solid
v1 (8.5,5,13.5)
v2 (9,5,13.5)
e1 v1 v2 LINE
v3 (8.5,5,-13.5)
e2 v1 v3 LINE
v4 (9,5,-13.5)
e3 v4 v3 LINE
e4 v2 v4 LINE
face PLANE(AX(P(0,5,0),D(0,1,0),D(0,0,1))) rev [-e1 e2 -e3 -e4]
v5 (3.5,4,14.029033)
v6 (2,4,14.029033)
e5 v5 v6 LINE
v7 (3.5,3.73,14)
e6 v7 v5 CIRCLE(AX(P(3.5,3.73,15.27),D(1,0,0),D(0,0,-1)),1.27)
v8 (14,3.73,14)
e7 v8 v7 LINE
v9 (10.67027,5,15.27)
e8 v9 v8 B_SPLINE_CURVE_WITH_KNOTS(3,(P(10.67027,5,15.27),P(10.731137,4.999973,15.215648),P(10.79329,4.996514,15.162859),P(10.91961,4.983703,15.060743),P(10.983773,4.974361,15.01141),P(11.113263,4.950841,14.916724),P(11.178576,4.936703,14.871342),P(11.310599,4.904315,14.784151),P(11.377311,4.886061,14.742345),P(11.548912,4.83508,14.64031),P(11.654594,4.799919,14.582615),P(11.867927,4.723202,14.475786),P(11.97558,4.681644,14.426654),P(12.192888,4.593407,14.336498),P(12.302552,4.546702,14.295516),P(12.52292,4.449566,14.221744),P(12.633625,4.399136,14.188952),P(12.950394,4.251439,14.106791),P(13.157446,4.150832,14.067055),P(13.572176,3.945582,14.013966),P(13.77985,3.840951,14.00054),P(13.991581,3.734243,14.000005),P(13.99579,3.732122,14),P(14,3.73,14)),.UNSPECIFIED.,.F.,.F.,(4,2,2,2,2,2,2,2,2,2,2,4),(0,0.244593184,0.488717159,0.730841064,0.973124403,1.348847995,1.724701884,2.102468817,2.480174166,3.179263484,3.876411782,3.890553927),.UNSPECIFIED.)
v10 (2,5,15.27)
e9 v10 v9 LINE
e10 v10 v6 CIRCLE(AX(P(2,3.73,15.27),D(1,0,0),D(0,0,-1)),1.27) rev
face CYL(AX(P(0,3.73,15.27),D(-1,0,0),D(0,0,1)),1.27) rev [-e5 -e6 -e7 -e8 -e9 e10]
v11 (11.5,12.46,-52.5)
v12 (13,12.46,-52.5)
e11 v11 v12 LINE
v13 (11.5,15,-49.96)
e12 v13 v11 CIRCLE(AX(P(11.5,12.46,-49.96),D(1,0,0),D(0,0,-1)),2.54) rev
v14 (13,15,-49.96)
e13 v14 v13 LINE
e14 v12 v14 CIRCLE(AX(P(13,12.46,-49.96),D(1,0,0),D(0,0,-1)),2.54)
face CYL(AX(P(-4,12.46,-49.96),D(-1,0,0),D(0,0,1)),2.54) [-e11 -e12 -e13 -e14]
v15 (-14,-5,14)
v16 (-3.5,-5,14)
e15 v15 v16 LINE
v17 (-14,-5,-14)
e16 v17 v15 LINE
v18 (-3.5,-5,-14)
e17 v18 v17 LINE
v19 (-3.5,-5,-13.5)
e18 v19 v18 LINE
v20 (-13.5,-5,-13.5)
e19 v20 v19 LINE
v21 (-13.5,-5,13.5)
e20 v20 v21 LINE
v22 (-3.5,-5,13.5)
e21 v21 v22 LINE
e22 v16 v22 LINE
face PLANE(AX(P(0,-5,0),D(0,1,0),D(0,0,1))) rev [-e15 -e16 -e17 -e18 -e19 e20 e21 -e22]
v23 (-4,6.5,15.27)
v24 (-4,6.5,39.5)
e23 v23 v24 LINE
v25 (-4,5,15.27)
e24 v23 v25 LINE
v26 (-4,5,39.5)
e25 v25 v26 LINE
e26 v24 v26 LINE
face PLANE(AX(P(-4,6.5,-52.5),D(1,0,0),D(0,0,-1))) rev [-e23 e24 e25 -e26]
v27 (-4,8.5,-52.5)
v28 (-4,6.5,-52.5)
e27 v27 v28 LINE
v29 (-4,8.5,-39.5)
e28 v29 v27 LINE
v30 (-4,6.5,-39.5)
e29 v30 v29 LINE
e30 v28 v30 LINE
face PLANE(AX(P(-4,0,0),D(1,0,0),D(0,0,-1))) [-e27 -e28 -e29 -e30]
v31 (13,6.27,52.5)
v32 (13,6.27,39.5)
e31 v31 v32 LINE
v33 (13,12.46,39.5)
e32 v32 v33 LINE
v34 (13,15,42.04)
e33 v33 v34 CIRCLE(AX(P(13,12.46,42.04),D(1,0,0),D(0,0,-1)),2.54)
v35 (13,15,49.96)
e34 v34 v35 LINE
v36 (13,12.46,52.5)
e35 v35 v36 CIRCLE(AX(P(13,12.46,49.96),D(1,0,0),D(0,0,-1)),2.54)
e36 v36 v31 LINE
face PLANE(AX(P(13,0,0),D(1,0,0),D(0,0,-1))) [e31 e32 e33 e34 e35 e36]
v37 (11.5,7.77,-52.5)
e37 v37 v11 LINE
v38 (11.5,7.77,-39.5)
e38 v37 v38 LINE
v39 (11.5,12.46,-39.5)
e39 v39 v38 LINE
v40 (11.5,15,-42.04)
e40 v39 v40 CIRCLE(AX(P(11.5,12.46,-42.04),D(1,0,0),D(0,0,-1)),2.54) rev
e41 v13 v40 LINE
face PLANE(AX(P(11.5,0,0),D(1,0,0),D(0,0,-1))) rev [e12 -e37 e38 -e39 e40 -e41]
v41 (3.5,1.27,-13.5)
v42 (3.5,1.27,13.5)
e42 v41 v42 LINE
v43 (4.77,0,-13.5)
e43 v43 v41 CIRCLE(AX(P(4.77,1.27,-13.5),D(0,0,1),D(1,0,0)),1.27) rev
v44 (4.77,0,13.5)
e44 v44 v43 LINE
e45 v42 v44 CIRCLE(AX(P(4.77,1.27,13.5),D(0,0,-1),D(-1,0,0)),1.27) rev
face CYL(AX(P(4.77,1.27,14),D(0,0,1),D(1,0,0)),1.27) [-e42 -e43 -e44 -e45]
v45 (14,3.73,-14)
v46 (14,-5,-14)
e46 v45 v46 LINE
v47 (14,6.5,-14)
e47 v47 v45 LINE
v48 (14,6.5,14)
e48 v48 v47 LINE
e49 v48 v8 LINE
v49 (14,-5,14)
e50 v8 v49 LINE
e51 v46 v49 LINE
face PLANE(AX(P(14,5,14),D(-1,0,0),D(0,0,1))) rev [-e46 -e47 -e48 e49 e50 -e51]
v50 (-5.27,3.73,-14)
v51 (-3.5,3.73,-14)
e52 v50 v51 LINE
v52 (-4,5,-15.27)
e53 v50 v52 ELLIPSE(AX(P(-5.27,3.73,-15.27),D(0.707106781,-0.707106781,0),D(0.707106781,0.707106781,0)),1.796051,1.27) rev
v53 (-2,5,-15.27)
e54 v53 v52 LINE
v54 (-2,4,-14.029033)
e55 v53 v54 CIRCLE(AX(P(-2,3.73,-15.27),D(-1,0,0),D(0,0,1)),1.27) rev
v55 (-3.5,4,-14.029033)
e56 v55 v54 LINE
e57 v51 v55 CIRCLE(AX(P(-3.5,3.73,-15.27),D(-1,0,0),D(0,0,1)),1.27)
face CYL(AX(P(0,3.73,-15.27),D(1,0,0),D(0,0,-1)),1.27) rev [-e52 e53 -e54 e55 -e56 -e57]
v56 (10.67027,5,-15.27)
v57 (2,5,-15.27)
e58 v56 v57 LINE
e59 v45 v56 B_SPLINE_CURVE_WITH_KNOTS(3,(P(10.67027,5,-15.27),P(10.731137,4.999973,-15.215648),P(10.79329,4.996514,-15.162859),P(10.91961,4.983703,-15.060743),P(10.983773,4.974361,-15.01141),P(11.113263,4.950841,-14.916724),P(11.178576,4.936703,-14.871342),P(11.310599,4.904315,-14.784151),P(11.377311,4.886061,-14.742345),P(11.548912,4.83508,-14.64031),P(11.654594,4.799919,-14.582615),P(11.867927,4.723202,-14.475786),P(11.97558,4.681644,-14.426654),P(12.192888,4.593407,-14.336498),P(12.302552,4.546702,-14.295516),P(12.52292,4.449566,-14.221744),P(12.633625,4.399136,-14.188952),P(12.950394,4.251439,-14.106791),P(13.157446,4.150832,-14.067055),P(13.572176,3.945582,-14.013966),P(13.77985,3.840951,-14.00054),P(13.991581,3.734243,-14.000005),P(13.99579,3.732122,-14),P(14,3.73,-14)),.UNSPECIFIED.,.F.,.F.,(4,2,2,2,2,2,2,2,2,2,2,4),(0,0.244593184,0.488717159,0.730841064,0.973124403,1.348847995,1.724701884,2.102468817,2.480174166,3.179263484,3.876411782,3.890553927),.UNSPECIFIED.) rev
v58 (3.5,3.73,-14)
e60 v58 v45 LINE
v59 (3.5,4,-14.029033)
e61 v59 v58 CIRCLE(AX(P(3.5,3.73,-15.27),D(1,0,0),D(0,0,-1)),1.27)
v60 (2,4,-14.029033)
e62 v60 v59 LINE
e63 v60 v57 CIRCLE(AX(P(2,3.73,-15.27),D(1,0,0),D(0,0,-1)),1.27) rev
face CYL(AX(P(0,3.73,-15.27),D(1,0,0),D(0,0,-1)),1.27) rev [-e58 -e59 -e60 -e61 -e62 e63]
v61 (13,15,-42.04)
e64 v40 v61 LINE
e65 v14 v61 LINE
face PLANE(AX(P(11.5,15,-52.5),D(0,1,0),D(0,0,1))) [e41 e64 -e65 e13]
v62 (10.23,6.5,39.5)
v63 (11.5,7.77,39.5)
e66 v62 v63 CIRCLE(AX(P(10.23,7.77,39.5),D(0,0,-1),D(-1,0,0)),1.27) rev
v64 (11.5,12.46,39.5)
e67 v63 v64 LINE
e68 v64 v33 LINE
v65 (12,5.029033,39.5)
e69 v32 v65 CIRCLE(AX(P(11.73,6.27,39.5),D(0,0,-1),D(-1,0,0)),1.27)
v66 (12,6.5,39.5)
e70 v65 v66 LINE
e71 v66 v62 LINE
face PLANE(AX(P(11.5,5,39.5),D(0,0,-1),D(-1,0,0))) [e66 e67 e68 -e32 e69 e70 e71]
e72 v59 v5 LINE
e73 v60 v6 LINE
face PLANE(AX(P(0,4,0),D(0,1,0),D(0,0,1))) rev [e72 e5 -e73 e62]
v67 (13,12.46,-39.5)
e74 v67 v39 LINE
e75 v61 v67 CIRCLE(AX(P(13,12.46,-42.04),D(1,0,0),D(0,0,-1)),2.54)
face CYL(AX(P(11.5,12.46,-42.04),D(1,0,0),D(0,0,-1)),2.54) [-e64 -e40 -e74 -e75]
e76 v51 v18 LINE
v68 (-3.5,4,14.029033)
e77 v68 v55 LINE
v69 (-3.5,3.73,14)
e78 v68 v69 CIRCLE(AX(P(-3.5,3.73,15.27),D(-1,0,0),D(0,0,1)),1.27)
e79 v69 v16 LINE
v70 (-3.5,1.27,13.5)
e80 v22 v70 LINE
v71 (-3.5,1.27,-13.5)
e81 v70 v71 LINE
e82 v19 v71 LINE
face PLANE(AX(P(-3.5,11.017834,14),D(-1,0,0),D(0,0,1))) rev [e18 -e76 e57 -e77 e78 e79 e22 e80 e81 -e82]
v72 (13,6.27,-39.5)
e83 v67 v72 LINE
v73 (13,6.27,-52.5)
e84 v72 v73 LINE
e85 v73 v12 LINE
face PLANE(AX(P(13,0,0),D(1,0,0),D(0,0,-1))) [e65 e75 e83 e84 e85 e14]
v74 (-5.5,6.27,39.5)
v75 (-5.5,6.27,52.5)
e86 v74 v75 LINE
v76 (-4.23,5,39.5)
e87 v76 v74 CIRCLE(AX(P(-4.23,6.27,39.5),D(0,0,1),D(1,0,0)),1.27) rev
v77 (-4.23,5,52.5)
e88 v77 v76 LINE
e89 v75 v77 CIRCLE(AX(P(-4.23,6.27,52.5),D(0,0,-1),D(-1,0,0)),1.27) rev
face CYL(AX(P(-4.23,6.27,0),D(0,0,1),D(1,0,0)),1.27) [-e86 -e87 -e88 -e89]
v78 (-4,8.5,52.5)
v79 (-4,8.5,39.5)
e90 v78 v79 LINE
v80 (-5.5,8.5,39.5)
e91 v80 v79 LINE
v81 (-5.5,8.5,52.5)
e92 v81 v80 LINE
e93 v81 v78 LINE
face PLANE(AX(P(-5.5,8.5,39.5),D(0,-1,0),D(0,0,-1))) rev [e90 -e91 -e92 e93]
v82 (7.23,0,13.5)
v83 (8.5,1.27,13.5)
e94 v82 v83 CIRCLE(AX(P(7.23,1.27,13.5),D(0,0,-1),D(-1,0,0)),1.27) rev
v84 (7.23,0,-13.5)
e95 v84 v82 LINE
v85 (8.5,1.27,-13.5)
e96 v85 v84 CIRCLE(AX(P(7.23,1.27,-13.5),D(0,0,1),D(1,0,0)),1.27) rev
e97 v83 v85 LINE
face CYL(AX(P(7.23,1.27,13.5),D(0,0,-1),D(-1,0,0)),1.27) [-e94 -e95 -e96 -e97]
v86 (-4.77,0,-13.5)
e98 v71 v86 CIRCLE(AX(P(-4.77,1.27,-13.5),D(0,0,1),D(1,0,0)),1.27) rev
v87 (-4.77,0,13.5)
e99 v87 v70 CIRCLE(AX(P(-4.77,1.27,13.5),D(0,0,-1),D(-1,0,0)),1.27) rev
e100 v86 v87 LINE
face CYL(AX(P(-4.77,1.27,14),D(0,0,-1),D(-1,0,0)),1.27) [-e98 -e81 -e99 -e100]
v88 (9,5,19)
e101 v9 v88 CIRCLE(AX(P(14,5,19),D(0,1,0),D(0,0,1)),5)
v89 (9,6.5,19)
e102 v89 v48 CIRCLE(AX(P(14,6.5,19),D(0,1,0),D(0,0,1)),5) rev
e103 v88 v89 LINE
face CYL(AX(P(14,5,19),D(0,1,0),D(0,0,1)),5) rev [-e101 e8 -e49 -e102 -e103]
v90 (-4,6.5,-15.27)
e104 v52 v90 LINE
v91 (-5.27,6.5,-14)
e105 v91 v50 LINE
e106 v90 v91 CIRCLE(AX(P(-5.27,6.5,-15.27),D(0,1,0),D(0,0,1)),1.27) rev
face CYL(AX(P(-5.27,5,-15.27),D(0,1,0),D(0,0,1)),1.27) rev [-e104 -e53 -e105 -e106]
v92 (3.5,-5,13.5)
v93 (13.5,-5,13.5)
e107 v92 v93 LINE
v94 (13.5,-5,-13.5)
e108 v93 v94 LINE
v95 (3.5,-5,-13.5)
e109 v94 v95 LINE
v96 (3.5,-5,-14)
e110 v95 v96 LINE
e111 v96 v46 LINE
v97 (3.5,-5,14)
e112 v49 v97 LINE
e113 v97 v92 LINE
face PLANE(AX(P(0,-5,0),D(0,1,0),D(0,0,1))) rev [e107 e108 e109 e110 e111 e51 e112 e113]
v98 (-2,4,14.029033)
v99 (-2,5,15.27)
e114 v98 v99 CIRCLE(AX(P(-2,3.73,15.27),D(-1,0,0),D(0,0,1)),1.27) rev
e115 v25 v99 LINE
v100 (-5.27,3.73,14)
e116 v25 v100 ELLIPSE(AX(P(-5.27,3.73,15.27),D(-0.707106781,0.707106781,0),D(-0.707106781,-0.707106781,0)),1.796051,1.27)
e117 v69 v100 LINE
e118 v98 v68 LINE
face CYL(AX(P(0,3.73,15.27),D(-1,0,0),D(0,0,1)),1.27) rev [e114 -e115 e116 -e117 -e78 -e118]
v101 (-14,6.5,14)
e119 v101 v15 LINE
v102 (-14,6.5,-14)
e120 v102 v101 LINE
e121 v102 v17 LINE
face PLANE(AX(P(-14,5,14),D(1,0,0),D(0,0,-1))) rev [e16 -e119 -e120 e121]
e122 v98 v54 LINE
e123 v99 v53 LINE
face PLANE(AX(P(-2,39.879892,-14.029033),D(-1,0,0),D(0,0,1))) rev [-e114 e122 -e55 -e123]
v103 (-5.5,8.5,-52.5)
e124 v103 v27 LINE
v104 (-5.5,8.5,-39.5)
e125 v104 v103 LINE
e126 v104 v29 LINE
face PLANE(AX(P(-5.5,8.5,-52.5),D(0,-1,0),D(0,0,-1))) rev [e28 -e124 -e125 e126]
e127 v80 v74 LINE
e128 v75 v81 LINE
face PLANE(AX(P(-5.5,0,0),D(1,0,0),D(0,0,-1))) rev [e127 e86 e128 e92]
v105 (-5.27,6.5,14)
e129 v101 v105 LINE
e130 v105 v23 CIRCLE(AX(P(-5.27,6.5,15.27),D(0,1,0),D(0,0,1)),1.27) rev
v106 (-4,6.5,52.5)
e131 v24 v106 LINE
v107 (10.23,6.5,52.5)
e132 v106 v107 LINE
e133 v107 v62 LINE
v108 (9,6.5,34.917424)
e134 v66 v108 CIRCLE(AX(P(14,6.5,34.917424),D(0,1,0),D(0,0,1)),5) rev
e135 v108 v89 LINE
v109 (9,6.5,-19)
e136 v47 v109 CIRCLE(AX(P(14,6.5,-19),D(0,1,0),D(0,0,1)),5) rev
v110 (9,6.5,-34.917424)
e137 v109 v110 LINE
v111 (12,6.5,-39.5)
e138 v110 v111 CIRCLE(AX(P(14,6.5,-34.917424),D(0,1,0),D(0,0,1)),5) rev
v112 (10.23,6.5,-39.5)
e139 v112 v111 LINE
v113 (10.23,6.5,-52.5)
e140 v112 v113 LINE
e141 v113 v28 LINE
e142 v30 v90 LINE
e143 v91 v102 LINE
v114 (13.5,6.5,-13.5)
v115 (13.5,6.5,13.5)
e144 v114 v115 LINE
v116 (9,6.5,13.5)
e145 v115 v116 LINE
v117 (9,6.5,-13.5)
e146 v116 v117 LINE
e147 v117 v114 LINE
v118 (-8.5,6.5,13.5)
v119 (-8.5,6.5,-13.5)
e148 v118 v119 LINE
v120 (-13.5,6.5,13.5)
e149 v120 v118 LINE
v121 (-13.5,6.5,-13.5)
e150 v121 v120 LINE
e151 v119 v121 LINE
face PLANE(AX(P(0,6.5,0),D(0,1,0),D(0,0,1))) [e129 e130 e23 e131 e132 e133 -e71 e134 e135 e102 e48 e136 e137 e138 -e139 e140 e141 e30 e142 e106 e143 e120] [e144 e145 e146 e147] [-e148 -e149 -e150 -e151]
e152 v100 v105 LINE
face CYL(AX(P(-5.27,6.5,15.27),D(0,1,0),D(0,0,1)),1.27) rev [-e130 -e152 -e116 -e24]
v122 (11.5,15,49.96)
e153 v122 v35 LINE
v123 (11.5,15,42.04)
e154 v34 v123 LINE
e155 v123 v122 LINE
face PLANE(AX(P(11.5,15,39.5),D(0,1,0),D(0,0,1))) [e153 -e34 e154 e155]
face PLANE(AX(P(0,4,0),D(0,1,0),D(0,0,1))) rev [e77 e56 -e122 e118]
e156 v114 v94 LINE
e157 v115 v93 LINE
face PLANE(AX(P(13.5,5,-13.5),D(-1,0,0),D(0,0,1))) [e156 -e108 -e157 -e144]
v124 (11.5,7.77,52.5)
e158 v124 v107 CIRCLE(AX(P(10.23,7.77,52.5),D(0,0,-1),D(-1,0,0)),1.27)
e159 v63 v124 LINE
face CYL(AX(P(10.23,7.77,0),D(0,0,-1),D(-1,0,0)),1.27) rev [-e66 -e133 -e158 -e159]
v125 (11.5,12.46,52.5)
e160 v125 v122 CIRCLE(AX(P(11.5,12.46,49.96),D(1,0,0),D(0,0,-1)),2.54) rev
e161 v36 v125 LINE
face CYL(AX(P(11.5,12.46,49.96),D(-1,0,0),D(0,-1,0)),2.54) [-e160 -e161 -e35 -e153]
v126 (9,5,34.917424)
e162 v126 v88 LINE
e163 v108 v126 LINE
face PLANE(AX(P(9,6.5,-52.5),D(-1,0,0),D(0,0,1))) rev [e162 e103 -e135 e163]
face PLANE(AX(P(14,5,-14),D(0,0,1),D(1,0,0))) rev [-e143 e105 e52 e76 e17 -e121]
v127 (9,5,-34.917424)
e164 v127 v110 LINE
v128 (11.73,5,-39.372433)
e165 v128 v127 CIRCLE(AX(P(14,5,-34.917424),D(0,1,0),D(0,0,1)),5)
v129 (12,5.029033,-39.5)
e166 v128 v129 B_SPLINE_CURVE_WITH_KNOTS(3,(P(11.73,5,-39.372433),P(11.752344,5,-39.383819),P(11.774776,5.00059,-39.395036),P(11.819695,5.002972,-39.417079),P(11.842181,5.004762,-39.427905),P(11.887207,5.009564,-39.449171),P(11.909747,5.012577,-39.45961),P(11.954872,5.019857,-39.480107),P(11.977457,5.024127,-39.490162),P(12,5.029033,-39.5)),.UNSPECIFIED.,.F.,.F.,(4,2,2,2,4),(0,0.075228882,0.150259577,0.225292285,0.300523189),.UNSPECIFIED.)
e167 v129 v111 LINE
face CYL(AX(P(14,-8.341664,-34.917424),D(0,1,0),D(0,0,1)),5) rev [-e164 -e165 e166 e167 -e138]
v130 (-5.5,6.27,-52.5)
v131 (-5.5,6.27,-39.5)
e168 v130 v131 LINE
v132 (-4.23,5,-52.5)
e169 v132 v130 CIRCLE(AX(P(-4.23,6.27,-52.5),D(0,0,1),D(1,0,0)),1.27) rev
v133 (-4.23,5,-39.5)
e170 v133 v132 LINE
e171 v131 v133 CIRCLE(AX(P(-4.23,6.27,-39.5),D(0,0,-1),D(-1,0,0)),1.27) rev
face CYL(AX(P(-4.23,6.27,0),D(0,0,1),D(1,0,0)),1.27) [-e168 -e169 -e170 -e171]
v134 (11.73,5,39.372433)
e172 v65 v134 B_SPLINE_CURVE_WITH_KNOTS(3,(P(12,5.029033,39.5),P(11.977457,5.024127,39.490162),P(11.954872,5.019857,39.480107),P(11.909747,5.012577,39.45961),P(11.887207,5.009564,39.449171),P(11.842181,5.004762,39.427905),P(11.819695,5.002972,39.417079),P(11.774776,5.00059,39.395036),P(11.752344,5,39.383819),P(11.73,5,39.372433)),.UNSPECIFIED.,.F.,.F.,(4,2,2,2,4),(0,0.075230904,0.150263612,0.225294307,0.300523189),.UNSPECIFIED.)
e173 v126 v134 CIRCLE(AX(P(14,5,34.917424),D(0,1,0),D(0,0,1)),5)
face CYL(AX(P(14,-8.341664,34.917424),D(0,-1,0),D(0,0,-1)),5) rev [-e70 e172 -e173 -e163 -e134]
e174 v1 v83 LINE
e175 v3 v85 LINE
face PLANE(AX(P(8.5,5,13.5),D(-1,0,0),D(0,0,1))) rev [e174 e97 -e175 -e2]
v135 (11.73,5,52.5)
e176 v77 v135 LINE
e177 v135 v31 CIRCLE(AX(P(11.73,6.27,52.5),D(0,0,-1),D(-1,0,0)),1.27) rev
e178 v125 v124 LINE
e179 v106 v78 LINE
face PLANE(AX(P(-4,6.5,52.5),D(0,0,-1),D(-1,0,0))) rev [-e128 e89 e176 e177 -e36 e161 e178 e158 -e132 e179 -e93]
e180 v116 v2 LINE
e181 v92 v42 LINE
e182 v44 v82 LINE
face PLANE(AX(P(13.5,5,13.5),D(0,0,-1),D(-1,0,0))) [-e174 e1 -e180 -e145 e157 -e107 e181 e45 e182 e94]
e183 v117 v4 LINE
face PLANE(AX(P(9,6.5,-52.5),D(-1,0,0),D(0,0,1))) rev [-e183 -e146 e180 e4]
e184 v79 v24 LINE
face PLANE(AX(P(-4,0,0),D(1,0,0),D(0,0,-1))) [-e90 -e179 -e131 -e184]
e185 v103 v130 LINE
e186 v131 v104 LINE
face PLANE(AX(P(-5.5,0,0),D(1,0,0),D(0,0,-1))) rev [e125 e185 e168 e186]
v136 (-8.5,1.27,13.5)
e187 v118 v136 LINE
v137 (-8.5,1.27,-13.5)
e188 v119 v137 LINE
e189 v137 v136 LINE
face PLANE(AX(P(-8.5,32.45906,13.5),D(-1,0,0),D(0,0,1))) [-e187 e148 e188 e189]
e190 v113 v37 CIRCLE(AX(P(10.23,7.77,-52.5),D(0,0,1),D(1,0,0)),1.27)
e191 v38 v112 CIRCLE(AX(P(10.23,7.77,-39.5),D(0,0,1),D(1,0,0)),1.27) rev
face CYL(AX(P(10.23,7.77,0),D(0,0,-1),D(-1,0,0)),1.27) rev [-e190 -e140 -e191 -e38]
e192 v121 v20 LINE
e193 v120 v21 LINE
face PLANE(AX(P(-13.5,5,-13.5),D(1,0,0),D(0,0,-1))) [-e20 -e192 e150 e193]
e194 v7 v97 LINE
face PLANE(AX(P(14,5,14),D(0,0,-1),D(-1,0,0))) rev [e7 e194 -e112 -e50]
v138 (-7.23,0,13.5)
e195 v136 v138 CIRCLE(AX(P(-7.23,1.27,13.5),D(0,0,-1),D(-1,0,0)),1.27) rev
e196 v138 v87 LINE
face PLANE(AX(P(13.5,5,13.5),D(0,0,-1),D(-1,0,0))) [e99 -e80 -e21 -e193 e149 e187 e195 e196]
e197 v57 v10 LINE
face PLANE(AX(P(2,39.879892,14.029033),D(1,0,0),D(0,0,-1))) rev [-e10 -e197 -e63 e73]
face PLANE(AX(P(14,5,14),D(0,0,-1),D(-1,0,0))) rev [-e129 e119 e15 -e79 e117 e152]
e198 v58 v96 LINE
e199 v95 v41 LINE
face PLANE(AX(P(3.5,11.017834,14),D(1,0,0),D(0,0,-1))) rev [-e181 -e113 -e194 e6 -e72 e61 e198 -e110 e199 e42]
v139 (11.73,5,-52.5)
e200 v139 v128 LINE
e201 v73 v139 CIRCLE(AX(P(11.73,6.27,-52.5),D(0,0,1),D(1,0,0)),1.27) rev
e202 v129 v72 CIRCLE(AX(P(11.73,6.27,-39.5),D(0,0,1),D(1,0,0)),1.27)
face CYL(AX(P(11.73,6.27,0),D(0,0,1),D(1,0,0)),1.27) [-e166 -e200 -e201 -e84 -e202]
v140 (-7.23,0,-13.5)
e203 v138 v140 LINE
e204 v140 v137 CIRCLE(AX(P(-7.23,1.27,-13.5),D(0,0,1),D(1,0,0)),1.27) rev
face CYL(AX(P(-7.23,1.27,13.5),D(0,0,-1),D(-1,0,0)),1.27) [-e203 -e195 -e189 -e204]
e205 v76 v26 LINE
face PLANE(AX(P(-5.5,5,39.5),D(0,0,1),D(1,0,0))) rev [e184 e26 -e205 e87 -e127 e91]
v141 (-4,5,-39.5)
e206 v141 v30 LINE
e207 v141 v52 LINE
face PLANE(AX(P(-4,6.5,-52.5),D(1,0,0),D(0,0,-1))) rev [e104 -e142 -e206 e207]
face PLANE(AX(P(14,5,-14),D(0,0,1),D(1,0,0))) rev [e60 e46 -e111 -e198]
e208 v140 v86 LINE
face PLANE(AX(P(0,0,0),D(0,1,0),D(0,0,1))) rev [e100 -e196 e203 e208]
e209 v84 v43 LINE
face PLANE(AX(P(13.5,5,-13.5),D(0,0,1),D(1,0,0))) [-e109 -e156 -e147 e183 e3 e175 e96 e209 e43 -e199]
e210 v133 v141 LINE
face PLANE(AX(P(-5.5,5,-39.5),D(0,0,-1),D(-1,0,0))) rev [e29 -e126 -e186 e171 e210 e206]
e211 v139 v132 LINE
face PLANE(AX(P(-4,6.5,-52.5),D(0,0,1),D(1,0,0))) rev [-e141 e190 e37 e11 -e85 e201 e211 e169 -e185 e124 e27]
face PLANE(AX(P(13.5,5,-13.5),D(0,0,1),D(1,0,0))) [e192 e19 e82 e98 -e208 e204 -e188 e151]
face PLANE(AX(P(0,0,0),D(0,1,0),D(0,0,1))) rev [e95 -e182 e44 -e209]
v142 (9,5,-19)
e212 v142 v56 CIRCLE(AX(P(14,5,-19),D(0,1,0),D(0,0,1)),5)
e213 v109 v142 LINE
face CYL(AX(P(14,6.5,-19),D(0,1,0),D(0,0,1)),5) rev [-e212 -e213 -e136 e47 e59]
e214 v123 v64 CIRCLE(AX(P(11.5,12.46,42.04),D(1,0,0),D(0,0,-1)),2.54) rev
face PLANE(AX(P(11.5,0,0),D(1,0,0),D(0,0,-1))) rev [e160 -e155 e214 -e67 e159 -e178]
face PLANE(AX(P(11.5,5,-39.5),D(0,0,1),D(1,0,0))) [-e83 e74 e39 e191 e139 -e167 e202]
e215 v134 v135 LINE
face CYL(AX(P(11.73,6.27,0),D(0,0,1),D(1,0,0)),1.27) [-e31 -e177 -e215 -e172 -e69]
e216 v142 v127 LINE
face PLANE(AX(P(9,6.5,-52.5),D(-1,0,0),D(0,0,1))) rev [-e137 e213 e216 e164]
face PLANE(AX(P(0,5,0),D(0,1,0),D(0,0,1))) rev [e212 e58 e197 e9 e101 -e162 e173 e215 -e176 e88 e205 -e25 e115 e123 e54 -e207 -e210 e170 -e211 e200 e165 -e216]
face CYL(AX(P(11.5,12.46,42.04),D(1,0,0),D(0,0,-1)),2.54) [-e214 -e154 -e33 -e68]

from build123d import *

# Parameters (mm, degrees)
SKETCH1_W                 = 28
SKETCH1_H                 = 28
SKETCH1_W_2               = 27
SKETCH1_H_2               = 27
BOSS_EXTRUDE1_DEPTH       = 5
SKETCH2_W                 = 27
SKETCH2_H                 = 27
BOSS_EXTRUDE2_DEPTH       = 1
SKETCH4_W                 = 7
SKETCH4_H                 = 0.5
CUT_EXTRUDE1_DEPTH        = 4
CUT_EXTRUDE2_DEPTH        = 21.199009877
CUT_EXTRUDE2_DEPTH_BACK   = 21.199009877
SKETCH5_W                 = 5
SKETCH5_H                 = 27
SKETCH7_W                 = 5
SKETCH7_H                 = 27
BOSS_EXTRUDE3_DEPTH       = 4
BOSS_EXTRUDE4_DEPTH       = 5
BOSS_EXTRUDE5_DEPTH       = 5
SKETCH10_W                = 13
SKETCH10_H                = 105
BOSS_EXTRUDE6_DEPTH       = 1.5
SKETCH11_W                = 10
SKETCH11_H                = 28
SKETCH11_W_2              = 5
SKETCH11_H_2              = 27
BOSS_EXTRUDE7_DEPTH       = 1.5
SKETCH12_W                = 3
SKETCH12_H                = 13
BOSS_EXTRUDE8_DEPTH       = 1.5
SKETCH14_W                = 3
SKETCH14_H                = 13
BOSS_EXTRUDE9_DEPTH       = 1.5
FILLET1_R                 = 5
BOSS_EXTRUDE10_DEPTH      = 1
BOSS_EXTRUDE10_DEPTH_BACK = 0.5
SKETCH15_W                = 13
SKETCH15_H                = 10.000000066
FILLET2_R                 = 1.27
FILLET3_R                 = 1.27
FILLET4_R                 = 1.27
FILLET5_R                 = 1.27
SKETCH16_W                = 13
SKETCH16_H                = 3.5
BOSS_EXTRUDE11_DEPTH      = 1.5
FILLET6_R                 = 1.27
FILLET7_R                 = 1.27
FILLET8_R                 = 2.54
CUT_EXTRUDE3_DEPTH        = 1


with BuildPart() as part:
    # Sketch1 → Boss-Extrude1 (new body)
    with BuildSketch(Plane(origin=(0, 0, 0), x_dir=(1, 0, 0), z_dir=(0, 1, 0))):
        Rectangle(SKETCH1_W, SKETCH1_H)
        Rectangle(SKETCH1_W_2, SKETCH1_H_2, mode=Mode.SUBTRACT)
    extrude(amount=BOSS_EXTRUDE1_DEPTH)

    # Sketch4 → Cut-Extrude1 (cut)
    with BuildSketch(Plane.XZ):
        with Locations((0, 13.75)):
            Rectangle(SKETCH4_W, SKETCH4_H)
        with Locations((0, -13.75)):
            Rectangle(SKETCH4_W, SKETCH4_H)
    extrude(amount=-CUT_EXTRUDE1_DEPTH, mode=Mode.SUBTRACT)



with BuildPart() as body_2:
    # Sketch2 → Boss-Extrude2 (new body)
    with BuildSketch(Plane(origin=(0, 5, 0), x_dir=(1, 0, 0), z_dir=(0, 1, 0))):
        Rectangle(SKETCH2_W, SKETCH2_H)
    extrude(amount=-BOSS_EXTRUDE2_DEPTH)

    # Sketch5 → Cut-Extrude2 (cut, two sides: drawn at the far end of the back side and taken through both)
    with BuildSketch(Plane.XZ.offset(-4).offset(-CUT_EXTRUDE2_DEPTH_BACK)):
        with Locations((-11, 0)):
            Rectangle(SKETCH5_W, SKETCH5_H)
        with Locations((11, 0)):
            Rectangle(SKETCH5_W, SKETCH5_H)
    extrude(amount=CUT_EXTRUDE2_DEPTH + CUT_EXTRUDE2_DEPTH_BACK, mode=Mode.SUBTRACT)


with BuildPart() as part_1:
    add(part.part)

    add(body_2.part)  # Boss-Extrude3 merges body 2
    # Sketch7 → Boss-Extrude3 (add)
    with BuildSketch(Plane.XZ.offset(-4)):
        with Locations((-6, 0)):
            Rectangle(SKETCH7_W, SKETCH7_H)
        with Locations((6, 0)):
            Rectangle(SKETCH7_W, SKETCH7_H)
    extrude(amount=BOSS_EXTRUDE3_DEPTH)

    # Sketch8 → Boss-Extrude4 (add)
    with BuildSketch(Plane.XZ):
        Polygon((-13.5, -13.5), (-13.5, 13.5), (-3.5, 13.5), (-3.5, 14), (-14, 14), (-14, -14), (-3.5, -14), (-3.5, -13.5), align=None)
    extrude(amount=BOSS_EXTRUDE4_DEPTH)

    # Sketch9 → Boss-Extrude5 (add)
    with BuildSketch(Plane.XZ):
        Polygon((3.5, 14), (14, 14), (14, -14), (3.5, -14), (3.5, -13.5), (13.5, -13.5), (13.5, 13.5), (3.5, 13.5), align=None)
    extrude(amount=BOSS_EXTRUDE5_DEPTH)

    # Sketch10 → Boss-Extrude6 (add)
    with BuildSketch(Plane(origin=(0, 5, 0), x_dir=(1, 0, 0), z_dir=(0, 1, 0))):
        with Locations((2.5, 0)):
            Rectangle(SKETCH10_W, SKETCH10_H)
    extrude(amount=BOSS_EXTRUDE6_DEPTH)

    # Sketch11 → Boss-Extrude7 (add)
    # profile 1 of 2: a face of its own
    with BuildSketch(Plane(origin=(0, 5, 0), x_dir=(1, 0, 0), z_dir=(0, 1, 0))):
        with Locations((-9, 0)):
            Rectangle(SKETCH11_W, SKETCH11_H)
        with Locations((-11, 0)):
            Rectangle(SKETCH11_W_2, SKETCH11_H_2, mode=Mode.SUBTRACT)
    # profile 2 of 2: a face of its own
    with BuildSketch(Plane(origin=(0, 5, 0), x_dir=(1, 0, 0), z_dir=(0, 1, 0))):
        Polygon((9, 13.5), (9, 14), (14, 14), (14, -14), (9, -14), (9, -13.5), (13.5, -13.5), (13.5, 13.5), align=None)
    extrude(amount=BOSS_EXTRUDE7_DEPTH)

    # Sketch12 → Boss-Extrude8 (add)
    with BuildSketch(Plane(origin=(0, 6.5, 0), x_dir=(1, 0, 0), z_dir=(0, 1, 0))):
        with Locations((10.5, -46)):
            Rectangle(SKETCH12_W, SKETCH12_H)
    extrude(amount=-BOSS_EXTRUDE8_DEPTH)

    # Sketch14 → Boss-Extrude9 (add)
    with BuildSketch(Plane(origin=(0, 6.5, 0), x_dir=(1, 0, 0), z_dir=(0, 1, 0))):
        with Locations((10.5, 46)):
            Rectangle(SKETCH14_W, SKETCH14_H)
    extrude(amount=-BOSS_EXTRUDE9_DEPTH)

    # Fillet1
    # the kernel refuses this fillet: 5 mm, written as the material it adds along each edge
    with BuildSketch(Plane(origin=(9, 6.5, 39.5), x_dir=(0, 0, -1), z_dir=(0, -1, 0))) as fillet1_piece_1:
        with BuildLine():
            CenterArc((4.582575695, 5), FILLET1_R, 203.578178478, 66.421821522)
            Line((0, 3), (-0.091651514, 2.96))
            ThreePointArc((-0.091651514, 2.96), (-0.1, 1.5), (-0.1, 0))
            Line((-0.1, 0), (0, -0.1))
            Line((0, -0.1), (4.582575695, -0.1))
            Line((4.582575695, -0.1), (4.582575695, 0))
        make_face()
    extrude(amount=1.5)
    with BuildSketch(Plane(origin=(9, 5, 14), x_dir=(1, 0, 0), z_dir=(0, 1, 0))) as fillet1_piece_2:
        with BuildLine():
            CenterArc((FILLET1_R, -FILLET1_R), FILLET1_R, 90, 90)
            Line((0, -FILLET1_R), (-FILLET1_R * 0.02, -FILLET1_R))
            Line((-FILLET1_R * 0.02, -FILLET1_R), (-FILLET1_R * 0.02, FILLET1_R * 0.02))
            Line((-FILLET1_R * 0.02, FILLET1_R * 0.02), (FILLET1_R, FILLET1_R * 0.02))
            Line((FILLET1_R, FILLET1_R * 0.02), (FILLET1_R, 0))
        make_face()
    extrude(amount=1.5)
    with BuildSketch(Plane(origin=(9, 5, -14), x_dir=(1, 0, 0), z_dir=(0, 1, 0))) as fillet1_piece_3:
        with BuildLine():
            CenterArc((FILLET1_R, FILLET1_R), FILLET1_R, 180, 90)
            Line((0, FILLET1_R), (-FILLET1_R * 0.02, FILLET1_R))
            Line((-FILLET1_R * 0.02, FILLET1_R), (-FILLET1_R * 0.02, -FILLET1_R * 0.02))
            Line((-FILLET1_R * 0.02, -FILLET1_R * 0.02), (FILLET1_R, -FILLET1_R * 0.02))
            Line((FILLET1_R, -FILLET1_R * 0.02), (FILLET1_R, 0))
        make_face()
    extrude(amount=1.5)
    with BuildSketch(Plane(origin=(9, 6.5, -39.5), x_dir=(0, 0, 1), z_dir=(0, -1, 0))) as fillet1_piece_4:
        with BuildLine():
            CenterArc((4.582575695, -5), FILLET1_R, 90, 66.421821522)
            Line((0, -3), (-0.091651514, -2.96))
            ThreePointArc((-0.091651514, -2.96), (-0.1, -1.5), (-0.1, 0))
            Line((-0.1, 0), (0, 0.1))
            Line((0, 0.1), (4.582575695, 0.1))
            Line((4.582575695, 0.1), (4.582575695, 0))
        make_face()
    extrude(amount=1.5)

    # Sketch15 → Boss-Extrude10 (add, two sides: drawn at the far end of the back side and taken through both)
    with BuildSketch(Plane(origin=(12, 0, 0), x_dir=(0, 0, -1), z_dir=(1, 0, 0)).offset(-BOSS_EXTRUDE10_DEPTH_BACK)):
        with Locations((46, 10.000000033)):
            Rectangle(SKETCH15_W, SKETCH15_H)
        with Locations((-46, 10.000000033)):
            Rectangle(SKETCH15_W, SKETCH15_H)
    extrude(amount=BOSS_EXTRUDE10_DEPTH + BOSS_EXTRUDE10_DEPTH_BACK)

    # Fillet2
    fillet2_edges = [part_1.edges().sort_by_distance(p)[0] for p in [
        (11.5, 6.5, -46),
        (11.5, 6.5, 46),
    ]]
    fillet(fillet2_edges, radius=FILLET2_R)

    # Fillet3
    # the kernel refuses this fillet: 1.27 mm, written as the material it adds along each edge
    with BuildSketch(Plane(origin=(-4, 5, 14), x_dir=(0, 0, 1), z_dir=(1, 0, 0))) as fillet3_piece_1_section:
        with BuildLine():
            CenterArc((FILLET3_R, FILLET3_R), FILLET3_R, 180, 90)
            Line((0, FILLET3_R), (0, 0))
            Line((0, 0), (FILLET3_R, 0))
        make_face()
    fillet3_piece_1 = extrude(amount=18, mode=Mode.PRIVATE)
    fillet3_piece_1 = fillet3_piece_1 - Plane(origin=(14, 4.722255872, 19), x_dir=(1, 0, 0), z_dir=(0, -1, 0)) * Cylinder(5, 42, mode=Mode.PRIVATE)
    fillet3_piece_1 = split(fillet3_piece_1, bisect_by=Plane(origin=(-3.75, 4, 14.285759195), z_dir=(0, 1, 0)), keep=Keep.TOP, mode=Mode.PRIVATE)
    add(fillet3_piece_1)
    with BuildSketch(Plane(origin=(-4, 5, 14), x_dir=(0, 0, 1), z_dir=(1, 0, 0))) as fillet3_piece_2_section:
        with BuildLine():
            CenterArc((FILLET3_R, FILLET3_R), FILLET3_R, 180, 90)
            Line((0, FILLET3_R), (0, 0))
            Line((0, 0), (FILLET3_R, 0))
        make_face()
    fillet3_piece_2 = extrude(amount=21.175, mode=Mode.PRIVATE)
    fillet3_piece_2 = split(fillet3_piece_2, bisect_by=Plane(origin=(-3.5, 3.932655267, 14.008692454), z_dir=(-1, 0, 0)), keep=Keep.TOP, mode=Mode.PRIVATE)
    add(fillet3_piece_2)
    with BuildSketch(Plane(origin=(-7.175, 5, 14), x_dir=(0, 0, 1), z_dir=(1, 0, 0))) as fillet3_piece_3_section:
        with BuildLine():
            CenterArc((FILLET3_R, FILLET3_R), FILLET3_R, 180, 90)
            Line((0, FILLET3_R), (0, 0))
            Line((0, 0), (FILLET3_R, 0))
        make_face()
    fillet3_piece_3 = extrude(amount=21.175, mode=Mode.PRIVATE)
    fillet3_piece_3 = fillet3_piece_3 - Plane(origin=(14, 3.932300045, 19), x_dir=(1, 0, 0), z_dir=(0, -1, 0)) * Cylinder(5, 48, mode=Mode.PRIVATE)
    fillet3_piece_3 = split(fillet3_piece_3, bisect_by=Plane(origin=(3.5, 3.932300045, 14.008616185), z_dir=(1, 0, 0)), keep=Keep.TOP, mode=Mode.PRIVATE)
    add(fillet3_piece_3)
    with BuildSketch(Plane(origin=(14, 5, -14), x_dir=(0, 0, -1), z_dir=(-1, 0, 0))) as fillet3_piece_4_section:
        with BuildLine():
            CenterArc((FILLET3_R, FILLET3_R), FILLET3_R, 180, 90)
            Line((0, FILLET3_R), (0, 0))
            Line((0, 0), (FILLET3_R, 0))
        make_face()
    fillet3_piece_4 = extrude(amount=18, mode=Mode.PRIVATE)
    fillet3_piece_4 = fillet3_piece_4 - Plane(origin=(14, 4.711484111, -19), x_dir=(1, 0, 0), z_dir=(0, -1, 0)) * Cylinder(5, 42, mode=Mode.PRIVATE)
    fillet3_piece_4 = split(fillet3_piece_4, bisect_by=Plane(origin=(8.027122346, 4, -14.26821747), z_dir=(0, 1, 0)), keep=Keep.TOP, mode=Mode.PRIVATE)
    add(fillet3_piece_4)
    with BuildSketch(Plane(origin=(14, 5, -14), x_dir=(0, 0, -1), z_dir=(-1, 0, 0))) as fillet3_piece_5_section:
        with BuildLine():
            CenterArc((FILLET3_R, FILLET3_R), FILLET3_R, 180, 90)
            Line((0, FILLET3_R), (0, 0))
            Line((0, 0), (FILLET3_R, 0))
        make_face()
    fillet3_piece_5 = extrude(amount=21.175, mode=Mode.PRIVATE)
    fillet3_piece_5 = fillet3_piece_5 - Plane(origin=(14, 3.932300045, -19), x_dir=(1, 0, 0), z_dir=(0, -1, 0)) * Cylinder(5, 48, mode=Mode.PRIVATE)
    fillet3_piece_5 = split(fillet3_piece_5, bisect_by=Plane(origin=(3.5, 3.932300045, -14.008616185), z_dir=(1, 0, 0)), keep=Keep.TOP, mode=Mode.PRIVATE)
    add(fillet3_piece_5)
    with BuildSketch(Plane(origin=(17.175, 5, -14), x_dir=(0, 0, -1), z_dir=(-1, 0, 0))) as fillet3_piece_6_section:
        with BuildLine():
            CenterArc((FILLET3_R, FILLET3_R), FILLET3_R, 180, 90)
            Line((0, FILLET3_R), (0, 0))
            Line((0, 0), (FILLET3_R, 0))
        make_face()
    fillet3_piece_6 = extrude(amount=21.175, mode=Mode.PRIVATE)
    fillet3_piece_6 = split(fillet3_piece_6, bisect_by=Plane(origin=(-3.5, 3.932655267, -14.008692454), z_dir=(-1, 0, 0)), keep=Keep.TOP, mode=Mode.PRIVATE)
    add(fillet3_piece_6)

    # Fillet4
    fillet4_edges = [part_1.edges().sort_by_distance(p)[0] for p in [
        (-3.5, 0, 0),
        (3.5, 0, 0),
        (-8.5, 0, 0),
        (8.5, 0, 0),
    ]]
    fillet(fillet4_edges, radius=FILLET4_R)

    # Fillet5
    fillet5_edges = [part_1.edges().sort_by_distance(p)[0] for p in [
        (-4, 5.115, -14),
        (-4, 5.115, 14),
    ]]
    fillet(fillet5_edges, radius=FILLET5_R)

    # Sketch16 → Boss-Extrude11 (add)
    with BuildSketch(Plane.ZY.offset(4)):
        with Locations((-46, 6.75)):
            Rectangle(SKETCH16_W, SKETCH16_H)
        with Locations((46, 6.75)):
            Rectangle(SKETCH16_W, SKETCH16_H)
    extrude(amount=BOSS_EXTRUDE11_DEPTH)

    # Fillet6
    fillet6_edges = [part_1.edges().sort_by_distance(p)[0] for p in [
        (-5.5, 5, 46),
        (-5.5, 5, -46),
    ]]
    fillet(fillet6_edges, radius=FILLET6_R)

    # Fillet7
    fillet7_edges = [part_1.edges().sort_by_distance(p)[0] for p in [
        (13, 5, 46),
        (13, 5, -46),
    ]]
    fillet(fillet7_edges, radius=FILLET7_R)

    # Fillet8
    fillet8_edges = [part_1.edges().sort_by_distance(p)[0] for p in [
        (12.25, 15.000000066, -52.5),
        (12.25, 15.000000066, -39.5),
        (12.25, 15.000000066, 39.5),
        (12.25, 15.000000066, 52.5),
    ]]
    fillet(fillet8_edges, radius=FILLET8_R)

    # Sketch17 → Cut-Extrude3 (cut)
    with BuildSketch(Plane.XZ.offset(-4)):
        Polygon((-2, 14.029032635), (-2, -14.029032635), (-2, -17.474025738), (2, -17.474025738), (2, -14.029032635), (2, 14.029032635), (2, 17.175749071), (-2, 17.175749071), align=None)
    extrude(amount=-CUT_EXTRUDE3_DEPTH, mode=Mode.SUBTRACT)


solid = part_1.part
